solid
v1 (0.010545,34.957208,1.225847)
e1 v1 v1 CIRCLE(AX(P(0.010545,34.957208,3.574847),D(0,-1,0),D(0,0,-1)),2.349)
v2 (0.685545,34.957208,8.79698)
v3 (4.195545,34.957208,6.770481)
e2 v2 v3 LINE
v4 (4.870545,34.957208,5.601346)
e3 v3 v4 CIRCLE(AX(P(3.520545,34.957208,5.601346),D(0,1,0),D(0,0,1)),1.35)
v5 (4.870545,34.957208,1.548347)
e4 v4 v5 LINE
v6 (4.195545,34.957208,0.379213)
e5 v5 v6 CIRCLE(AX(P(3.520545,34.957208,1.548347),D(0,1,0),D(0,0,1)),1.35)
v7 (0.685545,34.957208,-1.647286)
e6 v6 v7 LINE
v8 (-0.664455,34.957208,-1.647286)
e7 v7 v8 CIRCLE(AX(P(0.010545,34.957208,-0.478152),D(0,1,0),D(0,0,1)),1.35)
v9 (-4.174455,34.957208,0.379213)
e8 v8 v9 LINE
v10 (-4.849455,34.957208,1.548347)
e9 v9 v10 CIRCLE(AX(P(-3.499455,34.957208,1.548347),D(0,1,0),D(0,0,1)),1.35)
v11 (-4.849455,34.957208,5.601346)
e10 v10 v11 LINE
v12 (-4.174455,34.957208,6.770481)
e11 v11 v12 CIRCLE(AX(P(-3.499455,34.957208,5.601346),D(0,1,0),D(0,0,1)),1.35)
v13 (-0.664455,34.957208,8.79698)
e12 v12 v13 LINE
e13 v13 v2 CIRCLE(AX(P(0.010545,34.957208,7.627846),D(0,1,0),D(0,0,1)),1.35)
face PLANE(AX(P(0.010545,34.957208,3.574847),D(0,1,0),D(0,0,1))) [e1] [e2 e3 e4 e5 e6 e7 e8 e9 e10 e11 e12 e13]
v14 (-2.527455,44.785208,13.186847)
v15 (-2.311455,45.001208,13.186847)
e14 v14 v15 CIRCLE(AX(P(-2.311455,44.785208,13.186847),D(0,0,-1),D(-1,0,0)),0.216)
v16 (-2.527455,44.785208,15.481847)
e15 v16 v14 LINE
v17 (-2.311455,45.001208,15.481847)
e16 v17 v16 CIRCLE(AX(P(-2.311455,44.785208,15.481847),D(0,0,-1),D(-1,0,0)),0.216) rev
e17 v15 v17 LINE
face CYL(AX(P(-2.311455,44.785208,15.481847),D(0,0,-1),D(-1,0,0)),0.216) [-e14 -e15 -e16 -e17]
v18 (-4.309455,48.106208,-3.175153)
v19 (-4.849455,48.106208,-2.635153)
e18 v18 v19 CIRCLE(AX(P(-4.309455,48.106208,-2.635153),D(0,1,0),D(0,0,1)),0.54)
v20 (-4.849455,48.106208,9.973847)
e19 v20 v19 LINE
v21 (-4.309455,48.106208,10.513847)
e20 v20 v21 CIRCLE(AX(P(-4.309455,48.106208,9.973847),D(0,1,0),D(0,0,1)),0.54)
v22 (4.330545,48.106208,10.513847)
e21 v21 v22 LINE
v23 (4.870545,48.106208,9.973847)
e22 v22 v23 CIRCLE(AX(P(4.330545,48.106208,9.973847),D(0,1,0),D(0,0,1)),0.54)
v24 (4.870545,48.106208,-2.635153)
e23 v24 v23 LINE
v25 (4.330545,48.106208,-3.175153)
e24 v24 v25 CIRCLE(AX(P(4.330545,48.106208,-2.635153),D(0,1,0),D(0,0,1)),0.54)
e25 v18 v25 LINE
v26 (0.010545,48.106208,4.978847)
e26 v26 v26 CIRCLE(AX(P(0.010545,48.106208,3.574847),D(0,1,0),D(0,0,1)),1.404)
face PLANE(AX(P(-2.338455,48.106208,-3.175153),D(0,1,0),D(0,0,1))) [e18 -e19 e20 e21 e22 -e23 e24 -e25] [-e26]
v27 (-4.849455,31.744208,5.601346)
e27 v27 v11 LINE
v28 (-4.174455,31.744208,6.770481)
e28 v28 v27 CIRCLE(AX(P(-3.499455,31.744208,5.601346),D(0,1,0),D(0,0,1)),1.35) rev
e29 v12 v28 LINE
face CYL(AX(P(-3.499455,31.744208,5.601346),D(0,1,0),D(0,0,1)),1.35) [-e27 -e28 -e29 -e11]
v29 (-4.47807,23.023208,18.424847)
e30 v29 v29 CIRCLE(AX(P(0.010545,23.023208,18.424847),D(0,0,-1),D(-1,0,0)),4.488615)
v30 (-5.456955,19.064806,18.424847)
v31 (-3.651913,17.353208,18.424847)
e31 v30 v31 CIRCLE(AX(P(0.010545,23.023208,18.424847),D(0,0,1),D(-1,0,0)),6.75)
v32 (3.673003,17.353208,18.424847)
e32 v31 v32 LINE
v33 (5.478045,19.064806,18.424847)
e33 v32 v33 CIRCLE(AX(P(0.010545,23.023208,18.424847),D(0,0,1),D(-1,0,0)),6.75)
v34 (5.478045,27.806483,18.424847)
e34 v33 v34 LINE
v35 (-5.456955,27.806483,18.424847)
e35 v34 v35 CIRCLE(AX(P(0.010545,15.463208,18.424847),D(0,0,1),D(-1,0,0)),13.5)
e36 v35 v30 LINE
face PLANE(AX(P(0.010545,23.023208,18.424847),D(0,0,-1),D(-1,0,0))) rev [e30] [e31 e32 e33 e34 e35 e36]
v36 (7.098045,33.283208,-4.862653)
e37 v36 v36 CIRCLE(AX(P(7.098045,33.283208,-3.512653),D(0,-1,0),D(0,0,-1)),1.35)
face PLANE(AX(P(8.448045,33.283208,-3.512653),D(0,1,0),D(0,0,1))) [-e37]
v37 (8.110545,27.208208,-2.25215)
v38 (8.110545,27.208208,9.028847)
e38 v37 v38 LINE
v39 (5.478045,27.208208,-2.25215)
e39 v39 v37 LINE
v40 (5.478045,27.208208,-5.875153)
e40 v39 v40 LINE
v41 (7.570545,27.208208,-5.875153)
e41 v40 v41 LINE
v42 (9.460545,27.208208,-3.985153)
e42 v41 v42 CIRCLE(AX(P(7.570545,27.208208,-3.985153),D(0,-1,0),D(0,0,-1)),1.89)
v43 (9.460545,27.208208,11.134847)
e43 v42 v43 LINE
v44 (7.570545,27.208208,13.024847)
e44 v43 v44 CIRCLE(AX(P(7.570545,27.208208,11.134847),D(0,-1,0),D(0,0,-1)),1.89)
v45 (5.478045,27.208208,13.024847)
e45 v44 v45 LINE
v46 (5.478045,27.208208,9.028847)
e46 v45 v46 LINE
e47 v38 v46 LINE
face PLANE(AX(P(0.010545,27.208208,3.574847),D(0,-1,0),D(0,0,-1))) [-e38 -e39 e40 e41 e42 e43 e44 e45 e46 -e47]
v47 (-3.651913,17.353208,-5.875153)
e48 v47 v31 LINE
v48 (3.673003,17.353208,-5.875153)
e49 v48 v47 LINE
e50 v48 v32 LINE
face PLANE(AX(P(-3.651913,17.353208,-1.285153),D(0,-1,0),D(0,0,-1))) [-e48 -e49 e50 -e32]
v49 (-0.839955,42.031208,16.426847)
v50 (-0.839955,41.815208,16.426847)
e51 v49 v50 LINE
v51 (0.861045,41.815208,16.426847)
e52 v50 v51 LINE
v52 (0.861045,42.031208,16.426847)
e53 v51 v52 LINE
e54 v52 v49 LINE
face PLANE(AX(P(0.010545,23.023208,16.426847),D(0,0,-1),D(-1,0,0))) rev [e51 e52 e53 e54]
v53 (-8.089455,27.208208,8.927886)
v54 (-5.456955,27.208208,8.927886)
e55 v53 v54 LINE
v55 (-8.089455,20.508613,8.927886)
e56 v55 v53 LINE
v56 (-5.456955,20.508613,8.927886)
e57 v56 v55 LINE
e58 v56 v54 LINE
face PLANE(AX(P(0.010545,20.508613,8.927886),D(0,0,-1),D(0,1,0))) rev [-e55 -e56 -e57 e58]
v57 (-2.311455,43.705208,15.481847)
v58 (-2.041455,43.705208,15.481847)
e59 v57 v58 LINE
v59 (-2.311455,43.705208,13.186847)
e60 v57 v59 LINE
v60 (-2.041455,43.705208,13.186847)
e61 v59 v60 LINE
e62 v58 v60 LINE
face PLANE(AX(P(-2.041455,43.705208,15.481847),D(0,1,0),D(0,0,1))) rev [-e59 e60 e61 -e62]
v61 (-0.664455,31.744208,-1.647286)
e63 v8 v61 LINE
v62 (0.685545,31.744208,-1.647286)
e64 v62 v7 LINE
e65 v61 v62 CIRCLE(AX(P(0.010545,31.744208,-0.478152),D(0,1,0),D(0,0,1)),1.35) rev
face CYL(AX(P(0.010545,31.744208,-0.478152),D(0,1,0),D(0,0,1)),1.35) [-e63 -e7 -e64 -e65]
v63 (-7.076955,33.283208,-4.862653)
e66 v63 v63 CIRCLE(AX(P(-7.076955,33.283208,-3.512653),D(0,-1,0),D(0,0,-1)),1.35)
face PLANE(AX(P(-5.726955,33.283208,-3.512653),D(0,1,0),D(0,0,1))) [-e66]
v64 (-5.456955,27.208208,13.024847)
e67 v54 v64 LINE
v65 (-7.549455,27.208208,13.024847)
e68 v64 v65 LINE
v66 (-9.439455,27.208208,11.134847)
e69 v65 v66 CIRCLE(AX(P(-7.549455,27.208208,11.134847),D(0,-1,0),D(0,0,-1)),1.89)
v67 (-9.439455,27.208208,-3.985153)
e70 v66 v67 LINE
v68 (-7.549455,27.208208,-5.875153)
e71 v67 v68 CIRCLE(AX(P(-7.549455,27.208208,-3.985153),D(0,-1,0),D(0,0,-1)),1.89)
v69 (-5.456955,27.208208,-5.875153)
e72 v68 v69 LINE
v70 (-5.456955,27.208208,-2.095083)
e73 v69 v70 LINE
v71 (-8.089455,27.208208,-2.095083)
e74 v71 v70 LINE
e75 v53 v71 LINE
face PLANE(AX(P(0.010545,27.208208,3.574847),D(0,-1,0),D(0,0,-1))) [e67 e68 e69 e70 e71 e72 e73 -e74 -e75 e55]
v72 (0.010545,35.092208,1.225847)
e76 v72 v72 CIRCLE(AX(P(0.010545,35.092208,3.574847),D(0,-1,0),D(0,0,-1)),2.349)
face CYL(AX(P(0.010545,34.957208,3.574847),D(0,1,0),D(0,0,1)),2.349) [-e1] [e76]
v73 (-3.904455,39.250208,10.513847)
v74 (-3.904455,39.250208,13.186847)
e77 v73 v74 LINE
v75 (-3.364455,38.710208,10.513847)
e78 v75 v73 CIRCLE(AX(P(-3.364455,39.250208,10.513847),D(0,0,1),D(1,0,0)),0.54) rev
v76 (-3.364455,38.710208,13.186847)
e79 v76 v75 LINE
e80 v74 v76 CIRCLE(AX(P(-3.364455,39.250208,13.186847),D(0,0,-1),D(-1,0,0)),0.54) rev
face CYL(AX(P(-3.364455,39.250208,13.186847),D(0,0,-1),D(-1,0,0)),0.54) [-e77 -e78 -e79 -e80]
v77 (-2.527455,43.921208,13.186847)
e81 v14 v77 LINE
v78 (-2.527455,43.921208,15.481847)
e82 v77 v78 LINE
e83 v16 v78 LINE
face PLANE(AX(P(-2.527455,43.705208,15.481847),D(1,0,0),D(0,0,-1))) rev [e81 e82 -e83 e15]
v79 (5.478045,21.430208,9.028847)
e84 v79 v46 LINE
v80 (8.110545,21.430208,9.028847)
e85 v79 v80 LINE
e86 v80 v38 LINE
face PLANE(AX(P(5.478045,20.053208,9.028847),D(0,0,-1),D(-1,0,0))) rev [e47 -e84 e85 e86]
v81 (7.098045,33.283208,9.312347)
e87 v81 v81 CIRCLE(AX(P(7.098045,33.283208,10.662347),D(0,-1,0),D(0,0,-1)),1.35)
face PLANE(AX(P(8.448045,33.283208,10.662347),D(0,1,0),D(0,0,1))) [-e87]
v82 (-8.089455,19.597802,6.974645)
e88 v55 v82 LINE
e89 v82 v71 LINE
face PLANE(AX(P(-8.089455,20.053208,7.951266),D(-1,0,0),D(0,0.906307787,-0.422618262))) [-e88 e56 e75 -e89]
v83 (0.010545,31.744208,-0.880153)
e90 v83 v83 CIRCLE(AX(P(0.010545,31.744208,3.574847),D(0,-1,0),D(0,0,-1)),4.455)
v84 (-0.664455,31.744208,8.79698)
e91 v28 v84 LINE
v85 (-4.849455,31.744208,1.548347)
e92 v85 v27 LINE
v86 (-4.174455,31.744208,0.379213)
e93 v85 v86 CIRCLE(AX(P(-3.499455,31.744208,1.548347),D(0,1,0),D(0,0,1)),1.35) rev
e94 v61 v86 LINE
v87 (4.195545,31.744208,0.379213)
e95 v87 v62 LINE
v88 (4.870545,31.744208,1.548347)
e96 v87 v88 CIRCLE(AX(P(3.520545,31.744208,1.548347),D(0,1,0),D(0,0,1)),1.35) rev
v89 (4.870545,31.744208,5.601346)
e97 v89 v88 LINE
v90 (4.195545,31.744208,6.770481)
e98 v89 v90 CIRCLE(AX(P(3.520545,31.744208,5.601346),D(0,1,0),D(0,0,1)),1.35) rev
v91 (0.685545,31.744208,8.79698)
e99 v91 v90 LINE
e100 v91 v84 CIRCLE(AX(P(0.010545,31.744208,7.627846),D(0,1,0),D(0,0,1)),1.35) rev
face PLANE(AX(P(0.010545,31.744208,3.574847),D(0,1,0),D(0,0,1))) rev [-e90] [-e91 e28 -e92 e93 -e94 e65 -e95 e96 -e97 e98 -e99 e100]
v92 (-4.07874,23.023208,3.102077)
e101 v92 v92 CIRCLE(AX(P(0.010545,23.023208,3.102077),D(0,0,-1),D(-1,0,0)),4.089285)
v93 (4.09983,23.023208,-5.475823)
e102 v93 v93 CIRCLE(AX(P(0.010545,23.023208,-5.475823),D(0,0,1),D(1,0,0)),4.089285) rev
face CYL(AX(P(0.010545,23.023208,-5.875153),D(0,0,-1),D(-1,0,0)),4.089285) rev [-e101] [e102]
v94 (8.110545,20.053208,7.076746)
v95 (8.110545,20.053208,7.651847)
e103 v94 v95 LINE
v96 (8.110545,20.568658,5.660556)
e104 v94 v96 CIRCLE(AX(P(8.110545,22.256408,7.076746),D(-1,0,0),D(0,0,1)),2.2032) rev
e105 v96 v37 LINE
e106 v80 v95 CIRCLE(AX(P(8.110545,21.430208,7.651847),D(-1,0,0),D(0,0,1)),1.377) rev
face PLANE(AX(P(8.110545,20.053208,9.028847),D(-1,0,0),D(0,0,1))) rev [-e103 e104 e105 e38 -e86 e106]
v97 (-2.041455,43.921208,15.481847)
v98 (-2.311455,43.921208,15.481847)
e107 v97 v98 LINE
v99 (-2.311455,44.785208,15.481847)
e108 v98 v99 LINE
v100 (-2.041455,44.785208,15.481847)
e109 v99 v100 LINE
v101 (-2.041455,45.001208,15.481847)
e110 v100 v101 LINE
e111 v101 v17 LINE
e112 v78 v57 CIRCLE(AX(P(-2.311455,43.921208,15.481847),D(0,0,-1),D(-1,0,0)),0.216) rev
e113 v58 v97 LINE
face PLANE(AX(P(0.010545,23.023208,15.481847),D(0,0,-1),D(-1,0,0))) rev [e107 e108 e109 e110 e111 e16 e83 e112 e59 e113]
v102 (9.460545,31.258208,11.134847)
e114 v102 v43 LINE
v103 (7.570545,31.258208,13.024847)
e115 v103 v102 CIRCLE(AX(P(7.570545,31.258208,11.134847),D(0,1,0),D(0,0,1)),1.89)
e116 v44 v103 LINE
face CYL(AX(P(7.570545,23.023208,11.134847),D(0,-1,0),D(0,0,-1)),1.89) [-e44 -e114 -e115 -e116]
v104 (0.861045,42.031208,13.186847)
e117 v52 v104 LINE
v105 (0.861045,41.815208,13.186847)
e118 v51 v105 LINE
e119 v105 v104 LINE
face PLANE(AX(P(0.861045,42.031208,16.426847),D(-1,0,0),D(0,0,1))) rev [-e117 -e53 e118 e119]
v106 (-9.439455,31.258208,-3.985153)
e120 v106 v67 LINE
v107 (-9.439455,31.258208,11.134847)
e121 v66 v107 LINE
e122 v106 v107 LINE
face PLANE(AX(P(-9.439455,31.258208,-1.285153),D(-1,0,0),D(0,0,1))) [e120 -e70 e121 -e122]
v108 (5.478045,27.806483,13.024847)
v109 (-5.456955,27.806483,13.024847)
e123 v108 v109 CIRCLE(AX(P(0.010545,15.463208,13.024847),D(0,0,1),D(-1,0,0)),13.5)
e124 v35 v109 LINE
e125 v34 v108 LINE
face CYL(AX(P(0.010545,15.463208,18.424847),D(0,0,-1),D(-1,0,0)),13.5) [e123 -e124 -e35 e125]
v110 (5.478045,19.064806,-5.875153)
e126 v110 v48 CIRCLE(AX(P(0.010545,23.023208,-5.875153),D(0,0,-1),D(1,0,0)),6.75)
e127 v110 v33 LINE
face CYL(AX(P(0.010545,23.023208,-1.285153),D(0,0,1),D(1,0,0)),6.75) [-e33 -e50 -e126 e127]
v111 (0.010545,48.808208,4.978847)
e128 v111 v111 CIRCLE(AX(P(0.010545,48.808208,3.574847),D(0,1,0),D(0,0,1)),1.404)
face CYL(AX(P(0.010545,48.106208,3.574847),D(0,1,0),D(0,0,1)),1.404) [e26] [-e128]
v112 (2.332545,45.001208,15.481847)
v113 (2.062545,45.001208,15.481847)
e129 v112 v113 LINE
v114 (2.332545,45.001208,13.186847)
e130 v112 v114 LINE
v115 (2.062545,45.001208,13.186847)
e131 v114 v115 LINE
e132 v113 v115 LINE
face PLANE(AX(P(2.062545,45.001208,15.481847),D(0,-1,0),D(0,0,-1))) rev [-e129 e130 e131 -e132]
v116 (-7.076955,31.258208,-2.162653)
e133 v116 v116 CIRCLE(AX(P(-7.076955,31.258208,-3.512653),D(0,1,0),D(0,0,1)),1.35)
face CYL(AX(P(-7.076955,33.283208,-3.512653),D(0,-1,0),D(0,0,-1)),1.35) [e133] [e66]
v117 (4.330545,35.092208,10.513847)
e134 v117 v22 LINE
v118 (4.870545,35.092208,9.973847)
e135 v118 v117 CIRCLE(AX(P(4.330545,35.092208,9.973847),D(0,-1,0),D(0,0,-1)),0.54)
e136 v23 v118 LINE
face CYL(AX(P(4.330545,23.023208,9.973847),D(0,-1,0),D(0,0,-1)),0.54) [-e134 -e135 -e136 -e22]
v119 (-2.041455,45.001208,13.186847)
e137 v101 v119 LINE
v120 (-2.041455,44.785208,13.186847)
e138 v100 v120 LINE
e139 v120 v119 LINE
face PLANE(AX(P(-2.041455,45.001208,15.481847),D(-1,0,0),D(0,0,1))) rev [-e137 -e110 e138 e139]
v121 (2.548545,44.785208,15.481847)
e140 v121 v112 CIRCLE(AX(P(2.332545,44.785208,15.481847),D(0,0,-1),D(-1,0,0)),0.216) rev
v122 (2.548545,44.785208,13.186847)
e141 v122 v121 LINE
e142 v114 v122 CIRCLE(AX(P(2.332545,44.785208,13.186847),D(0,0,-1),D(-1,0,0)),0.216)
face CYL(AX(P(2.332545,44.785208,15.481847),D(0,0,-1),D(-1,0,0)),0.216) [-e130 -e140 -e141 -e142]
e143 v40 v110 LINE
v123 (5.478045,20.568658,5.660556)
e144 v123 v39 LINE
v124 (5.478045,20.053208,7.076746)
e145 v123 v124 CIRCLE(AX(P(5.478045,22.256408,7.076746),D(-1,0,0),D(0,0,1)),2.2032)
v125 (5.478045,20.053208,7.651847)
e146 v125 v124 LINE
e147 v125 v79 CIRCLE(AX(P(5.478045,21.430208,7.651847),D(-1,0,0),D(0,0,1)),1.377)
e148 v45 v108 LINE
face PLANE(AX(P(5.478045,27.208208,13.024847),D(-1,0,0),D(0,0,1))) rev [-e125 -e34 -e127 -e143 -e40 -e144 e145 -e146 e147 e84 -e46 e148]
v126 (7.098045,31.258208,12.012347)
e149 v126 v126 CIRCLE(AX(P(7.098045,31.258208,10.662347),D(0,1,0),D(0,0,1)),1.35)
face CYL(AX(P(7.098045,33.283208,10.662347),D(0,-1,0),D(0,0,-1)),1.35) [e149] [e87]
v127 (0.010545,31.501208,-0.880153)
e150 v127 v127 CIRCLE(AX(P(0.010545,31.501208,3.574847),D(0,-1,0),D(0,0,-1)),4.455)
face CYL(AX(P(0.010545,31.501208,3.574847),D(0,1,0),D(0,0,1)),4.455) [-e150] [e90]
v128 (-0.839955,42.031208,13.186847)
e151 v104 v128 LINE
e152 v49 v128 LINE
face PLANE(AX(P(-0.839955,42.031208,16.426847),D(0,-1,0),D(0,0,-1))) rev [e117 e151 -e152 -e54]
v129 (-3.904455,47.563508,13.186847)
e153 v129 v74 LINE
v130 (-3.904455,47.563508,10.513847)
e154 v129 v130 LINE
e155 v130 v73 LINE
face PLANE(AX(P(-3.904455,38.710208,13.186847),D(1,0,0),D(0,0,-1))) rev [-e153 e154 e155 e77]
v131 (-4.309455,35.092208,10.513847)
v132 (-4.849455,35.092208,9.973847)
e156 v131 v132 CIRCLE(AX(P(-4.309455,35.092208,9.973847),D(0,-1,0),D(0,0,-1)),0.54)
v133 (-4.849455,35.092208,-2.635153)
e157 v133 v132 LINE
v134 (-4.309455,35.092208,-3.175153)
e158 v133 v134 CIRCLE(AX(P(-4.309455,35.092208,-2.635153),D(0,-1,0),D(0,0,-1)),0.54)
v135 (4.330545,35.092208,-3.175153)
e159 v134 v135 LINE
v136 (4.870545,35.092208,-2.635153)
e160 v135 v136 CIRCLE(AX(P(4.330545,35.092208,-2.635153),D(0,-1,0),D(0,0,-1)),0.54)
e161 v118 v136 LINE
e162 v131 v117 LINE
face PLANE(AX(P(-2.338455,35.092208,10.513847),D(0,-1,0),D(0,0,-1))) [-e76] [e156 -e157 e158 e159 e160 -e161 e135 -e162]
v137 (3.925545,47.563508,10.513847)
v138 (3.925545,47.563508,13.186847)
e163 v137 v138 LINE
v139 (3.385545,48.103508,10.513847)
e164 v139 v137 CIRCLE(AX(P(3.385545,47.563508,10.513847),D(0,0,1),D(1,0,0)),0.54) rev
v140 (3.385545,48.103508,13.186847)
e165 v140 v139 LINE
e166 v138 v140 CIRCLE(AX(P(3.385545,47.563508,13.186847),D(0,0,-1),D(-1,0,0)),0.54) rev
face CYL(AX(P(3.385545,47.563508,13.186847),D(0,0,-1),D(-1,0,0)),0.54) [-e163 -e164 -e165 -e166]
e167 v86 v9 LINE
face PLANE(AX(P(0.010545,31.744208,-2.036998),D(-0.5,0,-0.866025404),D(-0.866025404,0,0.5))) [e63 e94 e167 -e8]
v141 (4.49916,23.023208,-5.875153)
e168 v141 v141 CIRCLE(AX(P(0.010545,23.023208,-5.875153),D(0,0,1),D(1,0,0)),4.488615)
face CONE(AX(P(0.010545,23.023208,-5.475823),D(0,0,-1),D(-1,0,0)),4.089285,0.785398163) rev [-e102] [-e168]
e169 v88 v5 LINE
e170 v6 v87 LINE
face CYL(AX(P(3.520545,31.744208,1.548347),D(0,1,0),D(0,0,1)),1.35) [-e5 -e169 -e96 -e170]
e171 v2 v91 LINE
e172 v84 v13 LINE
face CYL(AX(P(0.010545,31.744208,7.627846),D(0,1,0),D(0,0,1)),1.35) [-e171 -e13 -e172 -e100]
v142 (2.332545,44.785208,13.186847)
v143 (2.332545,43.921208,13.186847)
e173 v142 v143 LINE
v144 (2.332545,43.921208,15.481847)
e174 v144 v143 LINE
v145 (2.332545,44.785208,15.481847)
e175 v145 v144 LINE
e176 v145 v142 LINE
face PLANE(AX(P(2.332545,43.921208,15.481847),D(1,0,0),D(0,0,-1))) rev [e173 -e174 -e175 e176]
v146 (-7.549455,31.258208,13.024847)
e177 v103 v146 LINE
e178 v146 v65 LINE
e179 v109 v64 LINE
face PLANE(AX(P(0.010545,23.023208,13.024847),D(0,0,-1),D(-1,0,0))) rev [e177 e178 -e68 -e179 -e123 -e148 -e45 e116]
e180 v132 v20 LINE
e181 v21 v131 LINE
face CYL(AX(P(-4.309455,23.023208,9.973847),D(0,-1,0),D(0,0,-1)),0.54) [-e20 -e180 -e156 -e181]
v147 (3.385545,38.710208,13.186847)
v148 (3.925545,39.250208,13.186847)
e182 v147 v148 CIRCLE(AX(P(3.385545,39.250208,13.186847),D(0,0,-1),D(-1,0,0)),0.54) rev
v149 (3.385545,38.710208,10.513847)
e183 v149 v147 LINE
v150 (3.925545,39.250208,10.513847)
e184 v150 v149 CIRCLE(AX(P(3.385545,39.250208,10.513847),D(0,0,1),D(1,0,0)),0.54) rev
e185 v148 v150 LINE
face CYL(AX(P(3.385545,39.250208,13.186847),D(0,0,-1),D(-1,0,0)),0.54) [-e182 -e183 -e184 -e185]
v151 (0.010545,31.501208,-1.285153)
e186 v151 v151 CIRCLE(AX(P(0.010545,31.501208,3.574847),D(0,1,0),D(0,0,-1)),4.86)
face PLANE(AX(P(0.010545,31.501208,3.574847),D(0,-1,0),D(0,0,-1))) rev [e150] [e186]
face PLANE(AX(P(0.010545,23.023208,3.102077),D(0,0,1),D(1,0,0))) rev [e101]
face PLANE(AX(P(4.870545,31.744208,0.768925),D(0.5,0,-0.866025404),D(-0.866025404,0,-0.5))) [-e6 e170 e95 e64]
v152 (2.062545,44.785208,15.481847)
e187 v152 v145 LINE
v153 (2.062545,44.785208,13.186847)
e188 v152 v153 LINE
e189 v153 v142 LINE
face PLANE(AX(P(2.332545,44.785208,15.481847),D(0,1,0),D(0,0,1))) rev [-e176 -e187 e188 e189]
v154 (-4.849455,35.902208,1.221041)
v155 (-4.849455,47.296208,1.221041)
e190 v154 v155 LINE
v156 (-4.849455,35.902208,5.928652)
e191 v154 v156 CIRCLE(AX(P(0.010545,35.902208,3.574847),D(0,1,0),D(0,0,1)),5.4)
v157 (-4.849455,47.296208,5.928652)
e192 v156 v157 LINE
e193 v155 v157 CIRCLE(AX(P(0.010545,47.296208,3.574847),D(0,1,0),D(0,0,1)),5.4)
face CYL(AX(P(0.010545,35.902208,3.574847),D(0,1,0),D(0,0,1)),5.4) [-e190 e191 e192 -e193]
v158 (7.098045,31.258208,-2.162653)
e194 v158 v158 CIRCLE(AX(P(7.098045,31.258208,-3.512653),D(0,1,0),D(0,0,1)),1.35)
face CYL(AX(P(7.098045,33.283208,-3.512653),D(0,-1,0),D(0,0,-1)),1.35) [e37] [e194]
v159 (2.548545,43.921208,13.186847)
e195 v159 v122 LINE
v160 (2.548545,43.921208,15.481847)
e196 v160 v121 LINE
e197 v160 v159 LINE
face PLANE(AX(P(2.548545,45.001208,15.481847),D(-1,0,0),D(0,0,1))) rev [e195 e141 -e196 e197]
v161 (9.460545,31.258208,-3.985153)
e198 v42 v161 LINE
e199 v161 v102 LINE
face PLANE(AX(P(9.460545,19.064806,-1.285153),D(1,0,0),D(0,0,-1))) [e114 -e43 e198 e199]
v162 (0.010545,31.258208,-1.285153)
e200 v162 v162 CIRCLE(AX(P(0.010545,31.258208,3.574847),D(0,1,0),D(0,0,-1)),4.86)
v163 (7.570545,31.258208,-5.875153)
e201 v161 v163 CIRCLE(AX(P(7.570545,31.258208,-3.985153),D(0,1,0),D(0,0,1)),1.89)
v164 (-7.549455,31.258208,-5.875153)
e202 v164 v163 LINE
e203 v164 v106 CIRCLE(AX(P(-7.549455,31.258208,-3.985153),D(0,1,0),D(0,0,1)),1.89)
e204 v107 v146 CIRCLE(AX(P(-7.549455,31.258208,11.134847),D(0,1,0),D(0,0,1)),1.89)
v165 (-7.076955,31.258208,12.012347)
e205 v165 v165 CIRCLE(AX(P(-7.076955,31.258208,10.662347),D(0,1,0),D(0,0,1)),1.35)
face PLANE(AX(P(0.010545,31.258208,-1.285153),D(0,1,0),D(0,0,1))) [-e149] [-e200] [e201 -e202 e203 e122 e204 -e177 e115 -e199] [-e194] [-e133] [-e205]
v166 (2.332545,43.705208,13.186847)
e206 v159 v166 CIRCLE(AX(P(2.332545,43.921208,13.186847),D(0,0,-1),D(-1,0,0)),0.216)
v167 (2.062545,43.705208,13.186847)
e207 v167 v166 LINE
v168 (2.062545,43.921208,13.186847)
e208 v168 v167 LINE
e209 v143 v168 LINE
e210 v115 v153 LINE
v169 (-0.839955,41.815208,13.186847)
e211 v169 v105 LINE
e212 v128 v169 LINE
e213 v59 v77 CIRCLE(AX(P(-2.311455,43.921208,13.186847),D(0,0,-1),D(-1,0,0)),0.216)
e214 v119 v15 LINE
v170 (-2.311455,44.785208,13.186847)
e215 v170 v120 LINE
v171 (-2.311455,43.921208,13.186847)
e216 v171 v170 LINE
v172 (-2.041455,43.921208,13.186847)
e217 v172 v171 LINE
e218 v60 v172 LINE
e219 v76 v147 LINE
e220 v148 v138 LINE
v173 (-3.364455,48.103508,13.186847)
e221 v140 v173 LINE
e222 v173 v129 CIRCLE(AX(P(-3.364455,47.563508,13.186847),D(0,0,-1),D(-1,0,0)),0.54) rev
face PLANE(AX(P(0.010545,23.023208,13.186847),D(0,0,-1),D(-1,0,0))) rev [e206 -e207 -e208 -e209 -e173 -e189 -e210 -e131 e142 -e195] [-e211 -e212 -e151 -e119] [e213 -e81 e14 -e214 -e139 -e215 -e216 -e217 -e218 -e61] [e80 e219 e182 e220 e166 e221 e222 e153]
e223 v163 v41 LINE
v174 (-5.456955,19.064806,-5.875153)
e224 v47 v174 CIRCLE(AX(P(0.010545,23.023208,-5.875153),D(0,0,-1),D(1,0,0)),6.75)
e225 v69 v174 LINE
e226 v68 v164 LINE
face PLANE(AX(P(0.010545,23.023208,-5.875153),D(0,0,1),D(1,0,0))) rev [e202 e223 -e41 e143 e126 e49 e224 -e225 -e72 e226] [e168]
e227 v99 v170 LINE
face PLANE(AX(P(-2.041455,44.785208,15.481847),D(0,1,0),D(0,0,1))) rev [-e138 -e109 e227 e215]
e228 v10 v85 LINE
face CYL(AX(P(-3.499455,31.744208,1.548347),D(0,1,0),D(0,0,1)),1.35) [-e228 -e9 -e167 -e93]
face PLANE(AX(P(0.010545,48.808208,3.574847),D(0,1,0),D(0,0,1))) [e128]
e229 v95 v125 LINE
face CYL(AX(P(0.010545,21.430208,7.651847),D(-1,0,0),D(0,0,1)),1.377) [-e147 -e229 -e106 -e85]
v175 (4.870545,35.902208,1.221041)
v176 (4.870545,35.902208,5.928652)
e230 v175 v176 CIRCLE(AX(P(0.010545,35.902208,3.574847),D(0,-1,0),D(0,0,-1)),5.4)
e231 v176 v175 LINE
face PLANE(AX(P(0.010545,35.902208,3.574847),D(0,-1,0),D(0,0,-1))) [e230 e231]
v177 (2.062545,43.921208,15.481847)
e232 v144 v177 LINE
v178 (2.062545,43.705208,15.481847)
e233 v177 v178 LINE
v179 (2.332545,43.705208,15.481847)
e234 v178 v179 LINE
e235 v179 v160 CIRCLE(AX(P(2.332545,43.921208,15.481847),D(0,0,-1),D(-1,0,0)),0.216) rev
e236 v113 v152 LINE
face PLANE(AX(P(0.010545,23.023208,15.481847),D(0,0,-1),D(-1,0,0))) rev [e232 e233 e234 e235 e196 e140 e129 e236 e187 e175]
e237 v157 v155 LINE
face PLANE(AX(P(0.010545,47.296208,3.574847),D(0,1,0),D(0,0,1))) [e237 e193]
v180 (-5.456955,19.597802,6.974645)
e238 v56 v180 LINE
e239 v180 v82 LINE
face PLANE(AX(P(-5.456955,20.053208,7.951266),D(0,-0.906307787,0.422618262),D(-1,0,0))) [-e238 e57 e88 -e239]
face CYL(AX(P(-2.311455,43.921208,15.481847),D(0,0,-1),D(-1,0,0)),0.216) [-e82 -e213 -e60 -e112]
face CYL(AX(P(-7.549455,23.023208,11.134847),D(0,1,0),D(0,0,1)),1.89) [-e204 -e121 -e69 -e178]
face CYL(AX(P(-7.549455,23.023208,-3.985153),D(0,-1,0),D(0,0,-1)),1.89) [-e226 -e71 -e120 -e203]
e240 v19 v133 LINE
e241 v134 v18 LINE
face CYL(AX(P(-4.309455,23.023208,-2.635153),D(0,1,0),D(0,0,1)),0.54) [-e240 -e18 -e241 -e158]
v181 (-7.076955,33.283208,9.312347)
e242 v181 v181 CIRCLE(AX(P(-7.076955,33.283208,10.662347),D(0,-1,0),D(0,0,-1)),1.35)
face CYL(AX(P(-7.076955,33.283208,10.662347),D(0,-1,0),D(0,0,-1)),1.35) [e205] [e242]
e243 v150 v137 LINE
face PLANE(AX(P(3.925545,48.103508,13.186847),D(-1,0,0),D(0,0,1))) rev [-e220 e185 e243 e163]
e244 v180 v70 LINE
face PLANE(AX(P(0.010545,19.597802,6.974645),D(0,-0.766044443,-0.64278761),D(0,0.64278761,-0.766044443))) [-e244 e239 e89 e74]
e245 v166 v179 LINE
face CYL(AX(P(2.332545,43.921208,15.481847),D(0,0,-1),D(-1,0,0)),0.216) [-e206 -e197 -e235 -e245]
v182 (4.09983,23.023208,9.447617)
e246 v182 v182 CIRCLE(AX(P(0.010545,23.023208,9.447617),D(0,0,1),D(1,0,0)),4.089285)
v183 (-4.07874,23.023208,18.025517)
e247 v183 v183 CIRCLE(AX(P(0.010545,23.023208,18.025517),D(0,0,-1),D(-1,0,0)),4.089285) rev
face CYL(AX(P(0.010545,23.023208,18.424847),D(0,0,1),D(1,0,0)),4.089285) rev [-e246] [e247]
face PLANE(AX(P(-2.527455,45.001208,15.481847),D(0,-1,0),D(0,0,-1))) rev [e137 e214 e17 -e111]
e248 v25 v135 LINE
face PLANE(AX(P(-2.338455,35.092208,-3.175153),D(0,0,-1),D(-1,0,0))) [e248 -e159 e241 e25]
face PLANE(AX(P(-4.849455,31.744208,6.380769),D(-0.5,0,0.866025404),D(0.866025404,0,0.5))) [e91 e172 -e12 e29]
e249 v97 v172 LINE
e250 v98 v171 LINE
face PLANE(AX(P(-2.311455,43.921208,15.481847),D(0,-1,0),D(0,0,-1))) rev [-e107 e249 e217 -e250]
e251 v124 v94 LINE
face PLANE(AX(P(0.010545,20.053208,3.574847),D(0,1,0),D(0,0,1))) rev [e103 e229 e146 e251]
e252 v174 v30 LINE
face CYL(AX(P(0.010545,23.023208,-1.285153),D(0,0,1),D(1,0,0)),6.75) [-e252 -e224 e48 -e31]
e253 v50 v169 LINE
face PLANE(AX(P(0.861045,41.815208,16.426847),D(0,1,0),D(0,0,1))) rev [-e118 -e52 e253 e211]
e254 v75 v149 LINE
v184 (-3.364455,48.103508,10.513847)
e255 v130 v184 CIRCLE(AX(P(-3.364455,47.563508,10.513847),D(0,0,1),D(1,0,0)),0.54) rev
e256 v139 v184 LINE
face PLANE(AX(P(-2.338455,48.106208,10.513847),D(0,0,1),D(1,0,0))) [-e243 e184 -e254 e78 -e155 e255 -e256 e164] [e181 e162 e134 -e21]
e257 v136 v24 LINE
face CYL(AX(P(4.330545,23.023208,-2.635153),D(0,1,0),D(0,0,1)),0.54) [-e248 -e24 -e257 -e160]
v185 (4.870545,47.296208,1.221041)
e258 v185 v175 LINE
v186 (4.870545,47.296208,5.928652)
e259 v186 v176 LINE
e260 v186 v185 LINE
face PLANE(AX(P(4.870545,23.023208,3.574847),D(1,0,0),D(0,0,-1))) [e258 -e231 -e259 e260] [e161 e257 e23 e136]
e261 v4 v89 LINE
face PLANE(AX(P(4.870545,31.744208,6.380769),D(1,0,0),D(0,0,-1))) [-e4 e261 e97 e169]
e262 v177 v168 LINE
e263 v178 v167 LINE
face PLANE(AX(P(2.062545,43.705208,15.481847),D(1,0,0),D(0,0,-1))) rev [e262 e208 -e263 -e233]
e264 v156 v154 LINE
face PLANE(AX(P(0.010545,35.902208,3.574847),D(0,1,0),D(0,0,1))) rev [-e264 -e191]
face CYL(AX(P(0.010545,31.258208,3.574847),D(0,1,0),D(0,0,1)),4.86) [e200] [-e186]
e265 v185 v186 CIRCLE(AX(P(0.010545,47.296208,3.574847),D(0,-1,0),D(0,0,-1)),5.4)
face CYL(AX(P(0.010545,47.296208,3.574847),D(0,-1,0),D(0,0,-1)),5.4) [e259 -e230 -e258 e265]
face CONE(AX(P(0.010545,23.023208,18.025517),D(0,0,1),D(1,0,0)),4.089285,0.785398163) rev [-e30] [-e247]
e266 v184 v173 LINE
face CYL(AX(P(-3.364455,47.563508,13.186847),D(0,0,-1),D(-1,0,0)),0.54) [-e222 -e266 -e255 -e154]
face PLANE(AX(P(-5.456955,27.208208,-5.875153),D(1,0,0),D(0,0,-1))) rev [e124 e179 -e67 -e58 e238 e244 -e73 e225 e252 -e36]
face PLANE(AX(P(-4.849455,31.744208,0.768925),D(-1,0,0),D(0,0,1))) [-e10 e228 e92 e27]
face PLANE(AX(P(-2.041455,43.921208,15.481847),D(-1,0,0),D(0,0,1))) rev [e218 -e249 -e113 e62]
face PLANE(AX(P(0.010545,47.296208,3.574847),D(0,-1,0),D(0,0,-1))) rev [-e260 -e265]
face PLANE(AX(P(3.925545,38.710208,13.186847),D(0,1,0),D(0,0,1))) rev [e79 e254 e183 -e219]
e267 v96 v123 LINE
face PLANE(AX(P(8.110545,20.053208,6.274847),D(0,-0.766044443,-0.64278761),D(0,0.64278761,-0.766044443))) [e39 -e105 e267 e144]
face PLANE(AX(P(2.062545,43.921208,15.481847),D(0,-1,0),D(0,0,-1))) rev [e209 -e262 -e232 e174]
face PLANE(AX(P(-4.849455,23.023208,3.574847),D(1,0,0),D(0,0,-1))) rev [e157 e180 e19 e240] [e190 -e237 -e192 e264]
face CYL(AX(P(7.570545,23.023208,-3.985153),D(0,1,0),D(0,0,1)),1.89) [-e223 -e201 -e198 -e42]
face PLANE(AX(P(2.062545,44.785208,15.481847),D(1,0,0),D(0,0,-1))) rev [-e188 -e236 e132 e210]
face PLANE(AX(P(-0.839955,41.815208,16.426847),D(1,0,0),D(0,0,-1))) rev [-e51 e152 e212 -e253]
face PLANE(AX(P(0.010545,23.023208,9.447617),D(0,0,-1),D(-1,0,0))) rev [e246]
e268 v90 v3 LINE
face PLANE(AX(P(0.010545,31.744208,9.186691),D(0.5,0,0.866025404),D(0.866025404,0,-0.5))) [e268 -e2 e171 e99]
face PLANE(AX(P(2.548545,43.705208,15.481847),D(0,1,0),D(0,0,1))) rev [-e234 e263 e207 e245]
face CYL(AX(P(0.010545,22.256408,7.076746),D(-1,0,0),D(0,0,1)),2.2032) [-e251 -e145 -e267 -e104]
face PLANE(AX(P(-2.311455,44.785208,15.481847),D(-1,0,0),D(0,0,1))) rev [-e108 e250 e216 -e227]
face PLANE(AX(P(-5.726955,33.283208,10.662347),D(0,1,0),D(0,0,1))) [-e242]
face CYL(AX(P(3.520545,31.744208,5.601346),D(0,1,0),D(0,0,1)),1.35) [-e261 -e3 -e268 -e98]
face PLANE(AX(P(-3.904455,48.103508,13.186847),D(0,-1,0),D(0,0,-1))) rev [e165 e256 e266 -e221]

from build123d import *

# Parameters (mm, degrees)
IZIM1_W                      = 50.7
IZIM1_H                      = 48.2
Y_KSEKLIK_EKSTR_ZYON1_DEPTH  = 26.7
IZIM2_R                      = 8.7
Y_KSEKLIK_EKSTR_ZYON2_DEPTH  = 0.5
Y_KSEKLIK_EKSTR_ZYON3_DEPTH  = 11.9
IZIM4_R                      = 16.5
Y_KSEKLIK_EKSTR_ZYON4_DEPTH  = 0.9
IZIM5_R                      = 18
Y_KSEKLIK_EKSTR_ZYON5_DEPTH  = 0.9
Y_KSEKLIK_EKSTR_ZYON6_DEPTH  = 36
Y_KSEKLIK_EKSTR_ZYON7_DEPTH  = 17
Y_KSEKLIK_EKSTR_ZYON8_START  = 17
Y_KSEKLIK_EKSTR_ZYON8_DEPTH  = 17
IZIM9_W                      = 14.75
IZIM9_H                      = 70
KES_EKSTR_ZYON1_DEPTH        = 30.160746911
IZIM10_W                     = 14.75
IZIM10_H                     = 70
KES_EKSTR_ZYON2_DEPTH        = 30.160746911
IZIM11_W                     = 50.7
IZIM11_H                     = 48.2
Y_KSEKLIK_EKSTR_ZYON9_DEPTH  = 9.3
Y_KSEKLIK_EKSTR_ZYON10_START = 20
Y_KSEKLIK_EKSTR_ZYON10_DEPTH = 20
IZIM13_W                     = 9.75
IZIM13_H                     = 10.2
Y_KSEKLIK_EKSTR_ZYON11_DEPTH = 26.5
Y_KSEKLIK_EKSTR_ZYON12_DEPTH = 42.2
Y_KSEKLIK_EKSTR_ZYON13_START = -42.2
Y_KSEKLIK_EKSTR_ZYON13_DEPTH = 42.2
IZIM16_W                     = 29
IZIM16_H                     = 34.79
Y_KSEKLIK_EKSTR_ZYON14_DEPTH = 9.9
Y_KSEKLIK_EKSTR_ZYON15_DEPTH = 8.5
Y_KSEKLIK_EKSTR_ZYON16_DEPTH = 8.5
IZIM19_W                     = 6.3
IZIM19_H                     = 0.8
Y_KSEKLIK_EKSTR_ZYON17_DEPTH = 12
DRAFT1_ANGLE                 = 50
IZIM20_W                     = 5
IZIM20_H                     = 7.5
IZIM21_W                     = 5
IZIM21_H                     = 7.5
IZIM22_W                     = 5
IZIM22_H                     = 7.5
IZIM23_W                     = 5
IZIM23_H                     = 7.5
IZIM24_W                     = 5.2
IZIM24_H                     = 2.6
M27_BO_LUKLU_DELIK1_D        = 30.291
M27_BO_LUKLU_DELIK1_DEPTH    = 33.249
M27_BO_LUKLU_DELIK2_D        = 30.291
M27_BO_LUKLU_DELIK2_DEPTH    = 33.249
FEDER1_START                 = -30
FEDER1_DEPTH                 = 9.75
PAH1_SIZE                    = 1.479
RADYUS1_R                    = 0.8
RADYUS2_R                    = 2
RADYUS3_R                    = 5
RADYUS4_R                    = 5.1
RADYUS5_R                    = 7
RADYUS6_R                    = 8.16
L_EK1_SCALE                  = 0.27


# Read off the part's stored shape, not the designer's step: Feder1
with BuildPart() as part:
    # Çizim1 → Yükseklik-Ekstrüzyon1 (new body)
    with BuildSketch(Plane(origin=(18, 0, 0), x_dir=(0, 0, -1), z_dir=(1, 0, 0))):
        with Locations((-0.35, 68.8)):
            Rectangle(IZIM1_W, IZIM1_H)
    extrude(amount=-Y_KSEKLIK_EKSTR_ZYON1_DEPTH)

    # Çizim2 → Yükseklik-Ekstrüzyon2 (add)
    with BuildSketch(Plane.XZ.offset(-44.7)):
        with Locations(Location((0, 0, 0), (0, 0, 180))):
            Circle(IZIM2_R)
    extrude(amount=Y_KSEKLIK_EKSTR_ZYON2_DEPTH)

    # Çizim3 → Yükseklik-Ekstrüzyon3 (add)
    with BuildSketch(Plane(origin=(0, 44.2, 0), x_dir=(1, 0, 0), z_dir=(0, 1, 0))):
        Polygon((-18, 10.392304845), (-18, -10.392304845), (0, -20.784609691), (18, -10.392304845), (18, 10.392304845), (0, 20.784609691), align=None)
    extrude(amount=-Y_KSEKLIK_EKSTR_ZYON3_DEPTH)

    # Çizim4 → Yükseklik-Ekstrüzyon4 (add)
    with BuildSketch(Plane.XZ.offset(-32.3)):
        with Locations(Location((0, 0, 0), (0, 0, 270))):
            Circle(IZIM4_R)
    extrude(amount=Y_KSEKLIK_EKSTR_ZYON4_DEPTH)

    # Çizim5 → Yükseklik-Ekstrüzyon5 (add)
    with BuildSketch(Plane(origin=(0, 31.4, 0), x_dir=(1, 0, 0), z_dir=(0, 1, 0))):
        with Locations(Location((0, 0, 0), (0, 0, 90))):
            Circle(IZIM5_R)
    extrude(amount=-Y_KSEKLIK_EKSTR_ZYON5_DEPTH)

    # Çizim6 → Yükseklik-Ekstrüzyon6 (add)
    with BuildSketch(Plane.XY.offset(18)):
        with BuildLine():
            Line((-13.564659966, -21), (13.564659966, -21))
            ThreePointArc((13.564659966, -21), (17.201870235, -18.14099392), (20.25, -14.660746911))
            Line((20.25, -14.660746911), (35, -14.660746911))
            Line((35, -14.660746911), (35, 30.5))
            Line((35, 30.5), (0, 30.5))
            Line((0, 30.5), (-35, 30.5))
            Line((-35, 30.5), (-35, -14.660746911))
            Line((-35, -14.660746911), (-20.25, -14.660746911))
            ThreePointArc((-20.25, -14.660746911), (-17.201870235, -18.14099392), (-13.564659966, -21))
        make_face()
    extrude(amount=-Y_KSEKLIK_EKSTR_ZYON6_DEPTH)

    # Çizim7 → Yükseklik-Ekstrüzyon7 (add)
    with BuildSketch(Plane(origin=(0, 0, -18), x_dir=(-1, 0, 0), z_dir=(0, 0, -1))):
        with BuildLine():
            Line((13.564659966, -21), (-13.564659966, -21))
            ThreePointArc((-13.564659966, -21), (-17.201870235, -18.14099392), (-20.25, -14.660746911))
            Line((-20.25, -14.660746911), (-35, -14.660746911))
            Line((-35, -14.660746911), (-35, 30.5))
            Line((-35, 30.5), (35, 30.5))
            Line((35, 30.5), (35, -14.660746911))
            Line((35, -14.660746911), (20.25, -14.660746911))
            ThreePointArc((20.25, -14.660746911), (17.201870235, -18.14099392), (13.564659966, -21))
        make_face()
    extrude(amount=Y_KSEKLIK_EKSTR_ZYON7_DEPTH)

    # Çizim8 → Yükseklik-Ekstrüzyon8 (add)
    with BuildSketch(Plane.XY.offset(18).offset(Y_KSEKLIK_EKSTR_ZYON8_START)):
        with BuildLine():
            Line((13.564659966, -21), (-13.564659966, -21))
            ThreePointArc((-13.564659966, -21), (-17.201870235, -18.14099392), (-20.25, -14.660746911))
            Line((-20.25, -14.660746911), (-35, -14.660746911))
            Line((-35, -14.660746911), (-35, 30.5))
            Line((-35, 30.5), (35, 30.5))
            Line((35, 30.5), (35, -14.660746911))
            Line((35, -14.660746911), (20.25, -14.660746911))
            ThreePointArc((20.25, -14.660746911), (17.201870235, -18.14099392), (13.564659966, -21))
        make_face()
    extrude(amount=-Y_KSEKLIK_EKSTR_ZYON8_DEPTH)

    # Çizim9 → Kes-Ekstrüzyon1 (cut)
    with BuildSketch(Plane.XZ.offset(14.660746911)):
        with Locations((27.625, 0)):
            Rectangle(IZIM9_W, IZIM9_H)
    extrude(amount=-KES_EKSTR_ZYON1_DEPTH, mode=Mode.SUBTRACT)

    # Çizim10 → Kes-Ekstrüzyon2 (cut)
    with BuildSketch(Plane.XZ.offset(14.660746911)):
        with Locations((-27.625, 0)):
            Rectangle(IZIM10_W, IZIM10_H)
    extrude(amount=-KES_EKSTR_ZYON2_DEPTH, mode=Mode.SUBTRACT)

    # Çizim11 → Yükseklik-Ekstrüzyon9 (add)
    with BuildSketch(Plane.ZY.offset(8.7)):
        with Locations((0.35, 68.8)):
            Rectangle(IZIM11_W, IZIM11_H)
    extrude(amount=Y_KSEKLIK_EKSTR_ZYON9_DEPTH)

    # Çizim12 → Yükseklik-Ekstrüzyon10 (add)
    with BuildSketch(Plane.XY.offset(35).offset(Y_KSEKLIK_EKSTR_ZYON10_START)):
        with BuildLine():
            Line((-20.25, -14.660746911), (-20.25, 17.715834237))
            ThreePointArc((-20.25, 17.715834237), (0, 22), (20.25, 17.715834237))
            Line((20.25, 17.715834237), (20.25, -14.660746911))
            ThreePointArc((20.25, -14.660746911), (17.201870235, -18.14099392), (13.564659966, -21))
            Line((13.564659966, -21), (-13.564659966, -21))
            ThreePointArc((-13.564659966, -21), (-17.201870235, -18.14099392), (-20.25, -14.660746911))
        make_face()
    extrude(amount=-Y_KSEKLIK_EKSTR_ZYON10_DEPTH)

    # Çizim13 → Yükseklik-Ekstrüzyon11 (add)
    with BuildSketch(Plane.XZ.offset(-15.5)):
        with Locations((25.125, 15.1)):
            Rectangle(IZIM13_W, IZIM13_H)
    extrude(amount=Y_KSEKLIK_EKSTR_ZYON11_DEPTH)

    # Çizim14 → Yükseklik-Ekstrüzyon12 (add)
    with BuildSketch(Plane(origin=(0, 89.9, 0), x_dir=(1, 0, 0), z_dir=(0, 1, 0))):
        with BuildLine():
            Line((-18, -8.717797887), (-18, 8.717797887))
            ThreePointArc((-18, 8.717797887), (-20, 0), (-18, -8.717797887))
        make_face()
    extrude(amount=-Y_KSEKLIK_EKSTR_ZYON12_DEPTH)

    # Çizim15 → Yükseklik-Ekstrüzyon13 (add)
    with BuildSketch(Plane.XZ.offset(-47.7).offset(Y_KSEKLIK_EKSTR_ZYON13_START)):
        with BuildLine():
            Line((18, 8.717797887), (18, -8.717797887))
            ThreePointArc((18, -8.717797887), (20, 0), (18, 8.717797887))
        make_face()
    extrude(amount=Y_KSEKLIK_EKSTR_ZYON13_DEPTH)

    # Çizim16 → Yükseklik-Ekstrüzyon14 (add)
    with BuildSketch(Plane.XY.offset(25.7)):
        with Locations((0, 75.495)):
            Rectangle(IZIM16_W, IZIM16_H)
    extrude(amount=Y_KSEKLIK_EKSTR_ZYON14_DEPTH)

    # Çizim17 → Yükseklik-Ekstrüzyon15 (add)
    with BuildSketch(Plane.XY.offset(35.6)):
        Polygon((-9.4, 81.4), (-7.6, 81.4), (-7.6, 80.6), (-8.6, 80.6), (-8.6, 77.4), (-7.6, 77.4), (-7.6, 76.6), (-9.4, 76.6), align=None)
    extrude(amount=Y_KSEKLIK_EKSTR_ZYON15_DEPTH)

    # Çizim18 → Yükseklik-Ekstrüzyon16 (add)
    with BuildSketch(Plane.XY.offset(35.6)):
        Polygon((7.6, 77.4), (8.6, 77.4), (8.6, 80.6), (7.6, 80.6), (7.6, 81.4), (9.4, 81.4), (9.4, 76.6), (7.6, 76.6), align=None)
    extrude(amount=Y_KSEKLIK_EKSTR_ZYON16_DEPTH)

    # Çizim19 → Yükseklik-Ekstrüzyon17 (add)
    with BuildSketch(Plane.XY.offset(35.6)):
        with Locations((0, 70)):
            Rectangle(IZIM19_W, IZIM19_H)
    extrude(amount=Y_KSEKLIK_EKSTR_ZYON17_DEPTH)

    # Draft1
    draft1_faces = [part.faces().sort_by_distance(p)[0] for p in [
        (25.125, 2.25, 10),
    ]]
    draft(draft1_faces, Plane(origin=(0, -11, 0), x_dir=(0, 0, -1), z_dir=(0, -1, 0)), DRAFT1_ANGLE)

    # Çizim20 → Döndür1 (revolve)
    with BuildSketch(Plane.XY.offset(26.25), mode=Mode.PRIVATE) as d_nd_r1_sk:
        with Locations((-23.75, 34.25)):
            Rectangle(IZIM20_W, IZIM20_H)
    revolve(d_nd_r1_sk.sketch.rotate(Axis((-26.25, 38, 26.25), (0, -1, 0)), 270), axis=Axis((-26.25, 38, 26.25), (0, -1, 0)))

    # Çizim21 → Döndür2 (revolve)
    with BuildSketch(Plane.XY.offset(-26.25), mode=Mode.PRIVATE) as d_nd_r2_sk:
        with Locations((-23.75, 34.25)):
            Rectangle(IZIM21_W, IZIM21_H)
    revolve(d_nd_r2_sk.sketch.rotate(Axis((-26.25, 38, -26.25), (0, -1, 0)), 270), axis=Axis((-26.25, 38, -26.25), (0, -1, 0)))

    # Çizim22 → Döndür3 (revolve)
    with BuildSketch(Plane.XY.offset(-26.25), mode=Mode.PRIVATE) as d_nd_r3_sk:
        with Locations((28.75, 34.25)):
            Rectangle(IZIM22_W, IZIM22_H)
    revolve(d_nd_r3_sk.sketch.rotate(Axis((26.25, 38, -26.25), (0, -1, 0)), 270), axis=Axis((26.25, 38, -26.25), (0, -1, 0)))

    # Çizim23 → Döndür4 (revolve)
    with BuildSketch(Plane.XY.offset(26.25), mode=Mode.PRIVATE) as d_nd_r4_sk:
        with Locations((28.75, 34.25)):
            Rectangle(IZIM23_W, IZIM23_H)
    revolve(d_nd_r4_sk.sketch.rotate(Axis((26.25, 38, 26.25), (0, -1, 0)), 270), axis=Axis((26.25, 38, 26.25), (0, -1, 0)))

    # Çizim24 → Döndür5 (revolve)
    with BuildSketch(Plane(origin=(0, 0, 0), x_dir=(-1, 0, 0), z_dir=(0, 0, -1)), mode=Mode.PRIVATE) as d_nd_r5_sk:
        with Locations((-2.6, 94.2)):
            Rectangle(IZIM24_W, IZIM24_H)
    revolve(d_nd_r5_sk.sketch.rotate(Axis((0, 92.9, 0), (0, 1, 0)), 90), axis=Axis((0, 92.9, 0), (0, 1, 0)))

    # M27 Boşluklu Delik1
    with Locations(Plane.XY.offset(55)):
        with Locations((0, 0)):
            Hole(M27_BO_LUKLU_DELIK1_D / 2, depth=M27_BO_LUKLU_DELIK1_DEPTH)

    # M27 Boşluklu Delik2
    with Locations(Plane(origin=(0, 0, -35), x_dir=(-1, 0, 0), z_dir=(0, 0, -1))):
        with Locations((0, 0)):
            Hole(M27_BO_LUKLU_DELIK2_D / 2, depth=M27_BO_LUKLU_DELIK2_DEPTH)

    # Feder1 outline → Feder1 (add)
    with BuildSketch(Plane.YZ.offset(FEDER1_START)):
        Polygon((15.5, 19.826070485), (-9.313312955, 19.826070485), (-12.686687045, 12.591846402), (15.5, -20.999739147), align=None)
    extrude(amount=FEDER1_DEPTH)

    # Pah1
    pah1_edges = [part.edges().sort_by_distance(p)[0] for p in [
        (15.1455, 0, 55),
        (-15.1455, 0, -35),
    ]]
    chamfer(pah1_edges, length=PAH1_SIZE)

    # Radyus1
    radyus1_edges = [part.edges().sort_by_distance(p)[0] for p in [
        (-9.4, 81.4, 39.85),
        (-9.4, 76.6, 39.85),
        (9.4, 76.6, 39.85),
        (9.4, 81.4, 39.85),
    ]]
    fillet(radyus1_edges, radius=RADYUS1_R)

    # Radyus2
    radyus2_edges = [part.edges().sort_by_distance(p)[0] for p in [
        (-18, 68.8, -25),
        (-18, 68.8, 25.7),
        (-14.5, 92.89, 30.65),
        (-14.5, 58.1, 30.65),
        (14.5, 58.1, 30.65),
        (14.5, 92.89, 30.65),
        (18, 68.8, 25.7),
        (18, 68.8, -25),
    ]]
    fillet(radyus2_edges, radius=RADYUS2_R)

    # Radyus3
    radyus3_edges = [part.edges().sort_by_distance(p)[0] for p in [
        (-18, 38.25, -10.392304845),
        (0, 38.25, -20.784609691),
        (18, 38.25, -10.392304845),
        (18, 38.25, 10.392304845),
        (0, 38.25, 20.784609691),
        (-18, 38.25, 10.392304845),
    ]]
    fillet(radyus3_edges, radius=RADYUS3_R)

    # Radyus4
    radyus4_edges = [part.edges().sort_by_distance(p)[0] for p in [
        (25.125, -11, 20.2),
    ]]
    fillet(radyus4_edges, radius=RADYUS4_R)

    # Radyus5
    radyus5_edges = [part.edges().sort_by_distance(p)[0] for p in [
        (35, 23, 35),
        (-35, 23, -35),
        (35, 23, -35),
        (-35, 23, 35),
    ]]
    fillet(radyus5_edges, radius=RADYUS5_R)

    # Radyus6
    radyus6_edges = [part.edges().sort_by_distance(p)[0] for p in [
        (25.125, -11, 10),
    ]]
    fillet(radyus6_edges, radius=RADYUS6_R)


with BuildPart() as part_1:
    # Ölçek1: scaled about (0.014445195, 31.538640435, 4.897050437)
    add(part.part.scale(L_EK1_SCALE).moved(Location((0.010544992, 23.023207518, 3.574846819))))


solid = part_1.part
